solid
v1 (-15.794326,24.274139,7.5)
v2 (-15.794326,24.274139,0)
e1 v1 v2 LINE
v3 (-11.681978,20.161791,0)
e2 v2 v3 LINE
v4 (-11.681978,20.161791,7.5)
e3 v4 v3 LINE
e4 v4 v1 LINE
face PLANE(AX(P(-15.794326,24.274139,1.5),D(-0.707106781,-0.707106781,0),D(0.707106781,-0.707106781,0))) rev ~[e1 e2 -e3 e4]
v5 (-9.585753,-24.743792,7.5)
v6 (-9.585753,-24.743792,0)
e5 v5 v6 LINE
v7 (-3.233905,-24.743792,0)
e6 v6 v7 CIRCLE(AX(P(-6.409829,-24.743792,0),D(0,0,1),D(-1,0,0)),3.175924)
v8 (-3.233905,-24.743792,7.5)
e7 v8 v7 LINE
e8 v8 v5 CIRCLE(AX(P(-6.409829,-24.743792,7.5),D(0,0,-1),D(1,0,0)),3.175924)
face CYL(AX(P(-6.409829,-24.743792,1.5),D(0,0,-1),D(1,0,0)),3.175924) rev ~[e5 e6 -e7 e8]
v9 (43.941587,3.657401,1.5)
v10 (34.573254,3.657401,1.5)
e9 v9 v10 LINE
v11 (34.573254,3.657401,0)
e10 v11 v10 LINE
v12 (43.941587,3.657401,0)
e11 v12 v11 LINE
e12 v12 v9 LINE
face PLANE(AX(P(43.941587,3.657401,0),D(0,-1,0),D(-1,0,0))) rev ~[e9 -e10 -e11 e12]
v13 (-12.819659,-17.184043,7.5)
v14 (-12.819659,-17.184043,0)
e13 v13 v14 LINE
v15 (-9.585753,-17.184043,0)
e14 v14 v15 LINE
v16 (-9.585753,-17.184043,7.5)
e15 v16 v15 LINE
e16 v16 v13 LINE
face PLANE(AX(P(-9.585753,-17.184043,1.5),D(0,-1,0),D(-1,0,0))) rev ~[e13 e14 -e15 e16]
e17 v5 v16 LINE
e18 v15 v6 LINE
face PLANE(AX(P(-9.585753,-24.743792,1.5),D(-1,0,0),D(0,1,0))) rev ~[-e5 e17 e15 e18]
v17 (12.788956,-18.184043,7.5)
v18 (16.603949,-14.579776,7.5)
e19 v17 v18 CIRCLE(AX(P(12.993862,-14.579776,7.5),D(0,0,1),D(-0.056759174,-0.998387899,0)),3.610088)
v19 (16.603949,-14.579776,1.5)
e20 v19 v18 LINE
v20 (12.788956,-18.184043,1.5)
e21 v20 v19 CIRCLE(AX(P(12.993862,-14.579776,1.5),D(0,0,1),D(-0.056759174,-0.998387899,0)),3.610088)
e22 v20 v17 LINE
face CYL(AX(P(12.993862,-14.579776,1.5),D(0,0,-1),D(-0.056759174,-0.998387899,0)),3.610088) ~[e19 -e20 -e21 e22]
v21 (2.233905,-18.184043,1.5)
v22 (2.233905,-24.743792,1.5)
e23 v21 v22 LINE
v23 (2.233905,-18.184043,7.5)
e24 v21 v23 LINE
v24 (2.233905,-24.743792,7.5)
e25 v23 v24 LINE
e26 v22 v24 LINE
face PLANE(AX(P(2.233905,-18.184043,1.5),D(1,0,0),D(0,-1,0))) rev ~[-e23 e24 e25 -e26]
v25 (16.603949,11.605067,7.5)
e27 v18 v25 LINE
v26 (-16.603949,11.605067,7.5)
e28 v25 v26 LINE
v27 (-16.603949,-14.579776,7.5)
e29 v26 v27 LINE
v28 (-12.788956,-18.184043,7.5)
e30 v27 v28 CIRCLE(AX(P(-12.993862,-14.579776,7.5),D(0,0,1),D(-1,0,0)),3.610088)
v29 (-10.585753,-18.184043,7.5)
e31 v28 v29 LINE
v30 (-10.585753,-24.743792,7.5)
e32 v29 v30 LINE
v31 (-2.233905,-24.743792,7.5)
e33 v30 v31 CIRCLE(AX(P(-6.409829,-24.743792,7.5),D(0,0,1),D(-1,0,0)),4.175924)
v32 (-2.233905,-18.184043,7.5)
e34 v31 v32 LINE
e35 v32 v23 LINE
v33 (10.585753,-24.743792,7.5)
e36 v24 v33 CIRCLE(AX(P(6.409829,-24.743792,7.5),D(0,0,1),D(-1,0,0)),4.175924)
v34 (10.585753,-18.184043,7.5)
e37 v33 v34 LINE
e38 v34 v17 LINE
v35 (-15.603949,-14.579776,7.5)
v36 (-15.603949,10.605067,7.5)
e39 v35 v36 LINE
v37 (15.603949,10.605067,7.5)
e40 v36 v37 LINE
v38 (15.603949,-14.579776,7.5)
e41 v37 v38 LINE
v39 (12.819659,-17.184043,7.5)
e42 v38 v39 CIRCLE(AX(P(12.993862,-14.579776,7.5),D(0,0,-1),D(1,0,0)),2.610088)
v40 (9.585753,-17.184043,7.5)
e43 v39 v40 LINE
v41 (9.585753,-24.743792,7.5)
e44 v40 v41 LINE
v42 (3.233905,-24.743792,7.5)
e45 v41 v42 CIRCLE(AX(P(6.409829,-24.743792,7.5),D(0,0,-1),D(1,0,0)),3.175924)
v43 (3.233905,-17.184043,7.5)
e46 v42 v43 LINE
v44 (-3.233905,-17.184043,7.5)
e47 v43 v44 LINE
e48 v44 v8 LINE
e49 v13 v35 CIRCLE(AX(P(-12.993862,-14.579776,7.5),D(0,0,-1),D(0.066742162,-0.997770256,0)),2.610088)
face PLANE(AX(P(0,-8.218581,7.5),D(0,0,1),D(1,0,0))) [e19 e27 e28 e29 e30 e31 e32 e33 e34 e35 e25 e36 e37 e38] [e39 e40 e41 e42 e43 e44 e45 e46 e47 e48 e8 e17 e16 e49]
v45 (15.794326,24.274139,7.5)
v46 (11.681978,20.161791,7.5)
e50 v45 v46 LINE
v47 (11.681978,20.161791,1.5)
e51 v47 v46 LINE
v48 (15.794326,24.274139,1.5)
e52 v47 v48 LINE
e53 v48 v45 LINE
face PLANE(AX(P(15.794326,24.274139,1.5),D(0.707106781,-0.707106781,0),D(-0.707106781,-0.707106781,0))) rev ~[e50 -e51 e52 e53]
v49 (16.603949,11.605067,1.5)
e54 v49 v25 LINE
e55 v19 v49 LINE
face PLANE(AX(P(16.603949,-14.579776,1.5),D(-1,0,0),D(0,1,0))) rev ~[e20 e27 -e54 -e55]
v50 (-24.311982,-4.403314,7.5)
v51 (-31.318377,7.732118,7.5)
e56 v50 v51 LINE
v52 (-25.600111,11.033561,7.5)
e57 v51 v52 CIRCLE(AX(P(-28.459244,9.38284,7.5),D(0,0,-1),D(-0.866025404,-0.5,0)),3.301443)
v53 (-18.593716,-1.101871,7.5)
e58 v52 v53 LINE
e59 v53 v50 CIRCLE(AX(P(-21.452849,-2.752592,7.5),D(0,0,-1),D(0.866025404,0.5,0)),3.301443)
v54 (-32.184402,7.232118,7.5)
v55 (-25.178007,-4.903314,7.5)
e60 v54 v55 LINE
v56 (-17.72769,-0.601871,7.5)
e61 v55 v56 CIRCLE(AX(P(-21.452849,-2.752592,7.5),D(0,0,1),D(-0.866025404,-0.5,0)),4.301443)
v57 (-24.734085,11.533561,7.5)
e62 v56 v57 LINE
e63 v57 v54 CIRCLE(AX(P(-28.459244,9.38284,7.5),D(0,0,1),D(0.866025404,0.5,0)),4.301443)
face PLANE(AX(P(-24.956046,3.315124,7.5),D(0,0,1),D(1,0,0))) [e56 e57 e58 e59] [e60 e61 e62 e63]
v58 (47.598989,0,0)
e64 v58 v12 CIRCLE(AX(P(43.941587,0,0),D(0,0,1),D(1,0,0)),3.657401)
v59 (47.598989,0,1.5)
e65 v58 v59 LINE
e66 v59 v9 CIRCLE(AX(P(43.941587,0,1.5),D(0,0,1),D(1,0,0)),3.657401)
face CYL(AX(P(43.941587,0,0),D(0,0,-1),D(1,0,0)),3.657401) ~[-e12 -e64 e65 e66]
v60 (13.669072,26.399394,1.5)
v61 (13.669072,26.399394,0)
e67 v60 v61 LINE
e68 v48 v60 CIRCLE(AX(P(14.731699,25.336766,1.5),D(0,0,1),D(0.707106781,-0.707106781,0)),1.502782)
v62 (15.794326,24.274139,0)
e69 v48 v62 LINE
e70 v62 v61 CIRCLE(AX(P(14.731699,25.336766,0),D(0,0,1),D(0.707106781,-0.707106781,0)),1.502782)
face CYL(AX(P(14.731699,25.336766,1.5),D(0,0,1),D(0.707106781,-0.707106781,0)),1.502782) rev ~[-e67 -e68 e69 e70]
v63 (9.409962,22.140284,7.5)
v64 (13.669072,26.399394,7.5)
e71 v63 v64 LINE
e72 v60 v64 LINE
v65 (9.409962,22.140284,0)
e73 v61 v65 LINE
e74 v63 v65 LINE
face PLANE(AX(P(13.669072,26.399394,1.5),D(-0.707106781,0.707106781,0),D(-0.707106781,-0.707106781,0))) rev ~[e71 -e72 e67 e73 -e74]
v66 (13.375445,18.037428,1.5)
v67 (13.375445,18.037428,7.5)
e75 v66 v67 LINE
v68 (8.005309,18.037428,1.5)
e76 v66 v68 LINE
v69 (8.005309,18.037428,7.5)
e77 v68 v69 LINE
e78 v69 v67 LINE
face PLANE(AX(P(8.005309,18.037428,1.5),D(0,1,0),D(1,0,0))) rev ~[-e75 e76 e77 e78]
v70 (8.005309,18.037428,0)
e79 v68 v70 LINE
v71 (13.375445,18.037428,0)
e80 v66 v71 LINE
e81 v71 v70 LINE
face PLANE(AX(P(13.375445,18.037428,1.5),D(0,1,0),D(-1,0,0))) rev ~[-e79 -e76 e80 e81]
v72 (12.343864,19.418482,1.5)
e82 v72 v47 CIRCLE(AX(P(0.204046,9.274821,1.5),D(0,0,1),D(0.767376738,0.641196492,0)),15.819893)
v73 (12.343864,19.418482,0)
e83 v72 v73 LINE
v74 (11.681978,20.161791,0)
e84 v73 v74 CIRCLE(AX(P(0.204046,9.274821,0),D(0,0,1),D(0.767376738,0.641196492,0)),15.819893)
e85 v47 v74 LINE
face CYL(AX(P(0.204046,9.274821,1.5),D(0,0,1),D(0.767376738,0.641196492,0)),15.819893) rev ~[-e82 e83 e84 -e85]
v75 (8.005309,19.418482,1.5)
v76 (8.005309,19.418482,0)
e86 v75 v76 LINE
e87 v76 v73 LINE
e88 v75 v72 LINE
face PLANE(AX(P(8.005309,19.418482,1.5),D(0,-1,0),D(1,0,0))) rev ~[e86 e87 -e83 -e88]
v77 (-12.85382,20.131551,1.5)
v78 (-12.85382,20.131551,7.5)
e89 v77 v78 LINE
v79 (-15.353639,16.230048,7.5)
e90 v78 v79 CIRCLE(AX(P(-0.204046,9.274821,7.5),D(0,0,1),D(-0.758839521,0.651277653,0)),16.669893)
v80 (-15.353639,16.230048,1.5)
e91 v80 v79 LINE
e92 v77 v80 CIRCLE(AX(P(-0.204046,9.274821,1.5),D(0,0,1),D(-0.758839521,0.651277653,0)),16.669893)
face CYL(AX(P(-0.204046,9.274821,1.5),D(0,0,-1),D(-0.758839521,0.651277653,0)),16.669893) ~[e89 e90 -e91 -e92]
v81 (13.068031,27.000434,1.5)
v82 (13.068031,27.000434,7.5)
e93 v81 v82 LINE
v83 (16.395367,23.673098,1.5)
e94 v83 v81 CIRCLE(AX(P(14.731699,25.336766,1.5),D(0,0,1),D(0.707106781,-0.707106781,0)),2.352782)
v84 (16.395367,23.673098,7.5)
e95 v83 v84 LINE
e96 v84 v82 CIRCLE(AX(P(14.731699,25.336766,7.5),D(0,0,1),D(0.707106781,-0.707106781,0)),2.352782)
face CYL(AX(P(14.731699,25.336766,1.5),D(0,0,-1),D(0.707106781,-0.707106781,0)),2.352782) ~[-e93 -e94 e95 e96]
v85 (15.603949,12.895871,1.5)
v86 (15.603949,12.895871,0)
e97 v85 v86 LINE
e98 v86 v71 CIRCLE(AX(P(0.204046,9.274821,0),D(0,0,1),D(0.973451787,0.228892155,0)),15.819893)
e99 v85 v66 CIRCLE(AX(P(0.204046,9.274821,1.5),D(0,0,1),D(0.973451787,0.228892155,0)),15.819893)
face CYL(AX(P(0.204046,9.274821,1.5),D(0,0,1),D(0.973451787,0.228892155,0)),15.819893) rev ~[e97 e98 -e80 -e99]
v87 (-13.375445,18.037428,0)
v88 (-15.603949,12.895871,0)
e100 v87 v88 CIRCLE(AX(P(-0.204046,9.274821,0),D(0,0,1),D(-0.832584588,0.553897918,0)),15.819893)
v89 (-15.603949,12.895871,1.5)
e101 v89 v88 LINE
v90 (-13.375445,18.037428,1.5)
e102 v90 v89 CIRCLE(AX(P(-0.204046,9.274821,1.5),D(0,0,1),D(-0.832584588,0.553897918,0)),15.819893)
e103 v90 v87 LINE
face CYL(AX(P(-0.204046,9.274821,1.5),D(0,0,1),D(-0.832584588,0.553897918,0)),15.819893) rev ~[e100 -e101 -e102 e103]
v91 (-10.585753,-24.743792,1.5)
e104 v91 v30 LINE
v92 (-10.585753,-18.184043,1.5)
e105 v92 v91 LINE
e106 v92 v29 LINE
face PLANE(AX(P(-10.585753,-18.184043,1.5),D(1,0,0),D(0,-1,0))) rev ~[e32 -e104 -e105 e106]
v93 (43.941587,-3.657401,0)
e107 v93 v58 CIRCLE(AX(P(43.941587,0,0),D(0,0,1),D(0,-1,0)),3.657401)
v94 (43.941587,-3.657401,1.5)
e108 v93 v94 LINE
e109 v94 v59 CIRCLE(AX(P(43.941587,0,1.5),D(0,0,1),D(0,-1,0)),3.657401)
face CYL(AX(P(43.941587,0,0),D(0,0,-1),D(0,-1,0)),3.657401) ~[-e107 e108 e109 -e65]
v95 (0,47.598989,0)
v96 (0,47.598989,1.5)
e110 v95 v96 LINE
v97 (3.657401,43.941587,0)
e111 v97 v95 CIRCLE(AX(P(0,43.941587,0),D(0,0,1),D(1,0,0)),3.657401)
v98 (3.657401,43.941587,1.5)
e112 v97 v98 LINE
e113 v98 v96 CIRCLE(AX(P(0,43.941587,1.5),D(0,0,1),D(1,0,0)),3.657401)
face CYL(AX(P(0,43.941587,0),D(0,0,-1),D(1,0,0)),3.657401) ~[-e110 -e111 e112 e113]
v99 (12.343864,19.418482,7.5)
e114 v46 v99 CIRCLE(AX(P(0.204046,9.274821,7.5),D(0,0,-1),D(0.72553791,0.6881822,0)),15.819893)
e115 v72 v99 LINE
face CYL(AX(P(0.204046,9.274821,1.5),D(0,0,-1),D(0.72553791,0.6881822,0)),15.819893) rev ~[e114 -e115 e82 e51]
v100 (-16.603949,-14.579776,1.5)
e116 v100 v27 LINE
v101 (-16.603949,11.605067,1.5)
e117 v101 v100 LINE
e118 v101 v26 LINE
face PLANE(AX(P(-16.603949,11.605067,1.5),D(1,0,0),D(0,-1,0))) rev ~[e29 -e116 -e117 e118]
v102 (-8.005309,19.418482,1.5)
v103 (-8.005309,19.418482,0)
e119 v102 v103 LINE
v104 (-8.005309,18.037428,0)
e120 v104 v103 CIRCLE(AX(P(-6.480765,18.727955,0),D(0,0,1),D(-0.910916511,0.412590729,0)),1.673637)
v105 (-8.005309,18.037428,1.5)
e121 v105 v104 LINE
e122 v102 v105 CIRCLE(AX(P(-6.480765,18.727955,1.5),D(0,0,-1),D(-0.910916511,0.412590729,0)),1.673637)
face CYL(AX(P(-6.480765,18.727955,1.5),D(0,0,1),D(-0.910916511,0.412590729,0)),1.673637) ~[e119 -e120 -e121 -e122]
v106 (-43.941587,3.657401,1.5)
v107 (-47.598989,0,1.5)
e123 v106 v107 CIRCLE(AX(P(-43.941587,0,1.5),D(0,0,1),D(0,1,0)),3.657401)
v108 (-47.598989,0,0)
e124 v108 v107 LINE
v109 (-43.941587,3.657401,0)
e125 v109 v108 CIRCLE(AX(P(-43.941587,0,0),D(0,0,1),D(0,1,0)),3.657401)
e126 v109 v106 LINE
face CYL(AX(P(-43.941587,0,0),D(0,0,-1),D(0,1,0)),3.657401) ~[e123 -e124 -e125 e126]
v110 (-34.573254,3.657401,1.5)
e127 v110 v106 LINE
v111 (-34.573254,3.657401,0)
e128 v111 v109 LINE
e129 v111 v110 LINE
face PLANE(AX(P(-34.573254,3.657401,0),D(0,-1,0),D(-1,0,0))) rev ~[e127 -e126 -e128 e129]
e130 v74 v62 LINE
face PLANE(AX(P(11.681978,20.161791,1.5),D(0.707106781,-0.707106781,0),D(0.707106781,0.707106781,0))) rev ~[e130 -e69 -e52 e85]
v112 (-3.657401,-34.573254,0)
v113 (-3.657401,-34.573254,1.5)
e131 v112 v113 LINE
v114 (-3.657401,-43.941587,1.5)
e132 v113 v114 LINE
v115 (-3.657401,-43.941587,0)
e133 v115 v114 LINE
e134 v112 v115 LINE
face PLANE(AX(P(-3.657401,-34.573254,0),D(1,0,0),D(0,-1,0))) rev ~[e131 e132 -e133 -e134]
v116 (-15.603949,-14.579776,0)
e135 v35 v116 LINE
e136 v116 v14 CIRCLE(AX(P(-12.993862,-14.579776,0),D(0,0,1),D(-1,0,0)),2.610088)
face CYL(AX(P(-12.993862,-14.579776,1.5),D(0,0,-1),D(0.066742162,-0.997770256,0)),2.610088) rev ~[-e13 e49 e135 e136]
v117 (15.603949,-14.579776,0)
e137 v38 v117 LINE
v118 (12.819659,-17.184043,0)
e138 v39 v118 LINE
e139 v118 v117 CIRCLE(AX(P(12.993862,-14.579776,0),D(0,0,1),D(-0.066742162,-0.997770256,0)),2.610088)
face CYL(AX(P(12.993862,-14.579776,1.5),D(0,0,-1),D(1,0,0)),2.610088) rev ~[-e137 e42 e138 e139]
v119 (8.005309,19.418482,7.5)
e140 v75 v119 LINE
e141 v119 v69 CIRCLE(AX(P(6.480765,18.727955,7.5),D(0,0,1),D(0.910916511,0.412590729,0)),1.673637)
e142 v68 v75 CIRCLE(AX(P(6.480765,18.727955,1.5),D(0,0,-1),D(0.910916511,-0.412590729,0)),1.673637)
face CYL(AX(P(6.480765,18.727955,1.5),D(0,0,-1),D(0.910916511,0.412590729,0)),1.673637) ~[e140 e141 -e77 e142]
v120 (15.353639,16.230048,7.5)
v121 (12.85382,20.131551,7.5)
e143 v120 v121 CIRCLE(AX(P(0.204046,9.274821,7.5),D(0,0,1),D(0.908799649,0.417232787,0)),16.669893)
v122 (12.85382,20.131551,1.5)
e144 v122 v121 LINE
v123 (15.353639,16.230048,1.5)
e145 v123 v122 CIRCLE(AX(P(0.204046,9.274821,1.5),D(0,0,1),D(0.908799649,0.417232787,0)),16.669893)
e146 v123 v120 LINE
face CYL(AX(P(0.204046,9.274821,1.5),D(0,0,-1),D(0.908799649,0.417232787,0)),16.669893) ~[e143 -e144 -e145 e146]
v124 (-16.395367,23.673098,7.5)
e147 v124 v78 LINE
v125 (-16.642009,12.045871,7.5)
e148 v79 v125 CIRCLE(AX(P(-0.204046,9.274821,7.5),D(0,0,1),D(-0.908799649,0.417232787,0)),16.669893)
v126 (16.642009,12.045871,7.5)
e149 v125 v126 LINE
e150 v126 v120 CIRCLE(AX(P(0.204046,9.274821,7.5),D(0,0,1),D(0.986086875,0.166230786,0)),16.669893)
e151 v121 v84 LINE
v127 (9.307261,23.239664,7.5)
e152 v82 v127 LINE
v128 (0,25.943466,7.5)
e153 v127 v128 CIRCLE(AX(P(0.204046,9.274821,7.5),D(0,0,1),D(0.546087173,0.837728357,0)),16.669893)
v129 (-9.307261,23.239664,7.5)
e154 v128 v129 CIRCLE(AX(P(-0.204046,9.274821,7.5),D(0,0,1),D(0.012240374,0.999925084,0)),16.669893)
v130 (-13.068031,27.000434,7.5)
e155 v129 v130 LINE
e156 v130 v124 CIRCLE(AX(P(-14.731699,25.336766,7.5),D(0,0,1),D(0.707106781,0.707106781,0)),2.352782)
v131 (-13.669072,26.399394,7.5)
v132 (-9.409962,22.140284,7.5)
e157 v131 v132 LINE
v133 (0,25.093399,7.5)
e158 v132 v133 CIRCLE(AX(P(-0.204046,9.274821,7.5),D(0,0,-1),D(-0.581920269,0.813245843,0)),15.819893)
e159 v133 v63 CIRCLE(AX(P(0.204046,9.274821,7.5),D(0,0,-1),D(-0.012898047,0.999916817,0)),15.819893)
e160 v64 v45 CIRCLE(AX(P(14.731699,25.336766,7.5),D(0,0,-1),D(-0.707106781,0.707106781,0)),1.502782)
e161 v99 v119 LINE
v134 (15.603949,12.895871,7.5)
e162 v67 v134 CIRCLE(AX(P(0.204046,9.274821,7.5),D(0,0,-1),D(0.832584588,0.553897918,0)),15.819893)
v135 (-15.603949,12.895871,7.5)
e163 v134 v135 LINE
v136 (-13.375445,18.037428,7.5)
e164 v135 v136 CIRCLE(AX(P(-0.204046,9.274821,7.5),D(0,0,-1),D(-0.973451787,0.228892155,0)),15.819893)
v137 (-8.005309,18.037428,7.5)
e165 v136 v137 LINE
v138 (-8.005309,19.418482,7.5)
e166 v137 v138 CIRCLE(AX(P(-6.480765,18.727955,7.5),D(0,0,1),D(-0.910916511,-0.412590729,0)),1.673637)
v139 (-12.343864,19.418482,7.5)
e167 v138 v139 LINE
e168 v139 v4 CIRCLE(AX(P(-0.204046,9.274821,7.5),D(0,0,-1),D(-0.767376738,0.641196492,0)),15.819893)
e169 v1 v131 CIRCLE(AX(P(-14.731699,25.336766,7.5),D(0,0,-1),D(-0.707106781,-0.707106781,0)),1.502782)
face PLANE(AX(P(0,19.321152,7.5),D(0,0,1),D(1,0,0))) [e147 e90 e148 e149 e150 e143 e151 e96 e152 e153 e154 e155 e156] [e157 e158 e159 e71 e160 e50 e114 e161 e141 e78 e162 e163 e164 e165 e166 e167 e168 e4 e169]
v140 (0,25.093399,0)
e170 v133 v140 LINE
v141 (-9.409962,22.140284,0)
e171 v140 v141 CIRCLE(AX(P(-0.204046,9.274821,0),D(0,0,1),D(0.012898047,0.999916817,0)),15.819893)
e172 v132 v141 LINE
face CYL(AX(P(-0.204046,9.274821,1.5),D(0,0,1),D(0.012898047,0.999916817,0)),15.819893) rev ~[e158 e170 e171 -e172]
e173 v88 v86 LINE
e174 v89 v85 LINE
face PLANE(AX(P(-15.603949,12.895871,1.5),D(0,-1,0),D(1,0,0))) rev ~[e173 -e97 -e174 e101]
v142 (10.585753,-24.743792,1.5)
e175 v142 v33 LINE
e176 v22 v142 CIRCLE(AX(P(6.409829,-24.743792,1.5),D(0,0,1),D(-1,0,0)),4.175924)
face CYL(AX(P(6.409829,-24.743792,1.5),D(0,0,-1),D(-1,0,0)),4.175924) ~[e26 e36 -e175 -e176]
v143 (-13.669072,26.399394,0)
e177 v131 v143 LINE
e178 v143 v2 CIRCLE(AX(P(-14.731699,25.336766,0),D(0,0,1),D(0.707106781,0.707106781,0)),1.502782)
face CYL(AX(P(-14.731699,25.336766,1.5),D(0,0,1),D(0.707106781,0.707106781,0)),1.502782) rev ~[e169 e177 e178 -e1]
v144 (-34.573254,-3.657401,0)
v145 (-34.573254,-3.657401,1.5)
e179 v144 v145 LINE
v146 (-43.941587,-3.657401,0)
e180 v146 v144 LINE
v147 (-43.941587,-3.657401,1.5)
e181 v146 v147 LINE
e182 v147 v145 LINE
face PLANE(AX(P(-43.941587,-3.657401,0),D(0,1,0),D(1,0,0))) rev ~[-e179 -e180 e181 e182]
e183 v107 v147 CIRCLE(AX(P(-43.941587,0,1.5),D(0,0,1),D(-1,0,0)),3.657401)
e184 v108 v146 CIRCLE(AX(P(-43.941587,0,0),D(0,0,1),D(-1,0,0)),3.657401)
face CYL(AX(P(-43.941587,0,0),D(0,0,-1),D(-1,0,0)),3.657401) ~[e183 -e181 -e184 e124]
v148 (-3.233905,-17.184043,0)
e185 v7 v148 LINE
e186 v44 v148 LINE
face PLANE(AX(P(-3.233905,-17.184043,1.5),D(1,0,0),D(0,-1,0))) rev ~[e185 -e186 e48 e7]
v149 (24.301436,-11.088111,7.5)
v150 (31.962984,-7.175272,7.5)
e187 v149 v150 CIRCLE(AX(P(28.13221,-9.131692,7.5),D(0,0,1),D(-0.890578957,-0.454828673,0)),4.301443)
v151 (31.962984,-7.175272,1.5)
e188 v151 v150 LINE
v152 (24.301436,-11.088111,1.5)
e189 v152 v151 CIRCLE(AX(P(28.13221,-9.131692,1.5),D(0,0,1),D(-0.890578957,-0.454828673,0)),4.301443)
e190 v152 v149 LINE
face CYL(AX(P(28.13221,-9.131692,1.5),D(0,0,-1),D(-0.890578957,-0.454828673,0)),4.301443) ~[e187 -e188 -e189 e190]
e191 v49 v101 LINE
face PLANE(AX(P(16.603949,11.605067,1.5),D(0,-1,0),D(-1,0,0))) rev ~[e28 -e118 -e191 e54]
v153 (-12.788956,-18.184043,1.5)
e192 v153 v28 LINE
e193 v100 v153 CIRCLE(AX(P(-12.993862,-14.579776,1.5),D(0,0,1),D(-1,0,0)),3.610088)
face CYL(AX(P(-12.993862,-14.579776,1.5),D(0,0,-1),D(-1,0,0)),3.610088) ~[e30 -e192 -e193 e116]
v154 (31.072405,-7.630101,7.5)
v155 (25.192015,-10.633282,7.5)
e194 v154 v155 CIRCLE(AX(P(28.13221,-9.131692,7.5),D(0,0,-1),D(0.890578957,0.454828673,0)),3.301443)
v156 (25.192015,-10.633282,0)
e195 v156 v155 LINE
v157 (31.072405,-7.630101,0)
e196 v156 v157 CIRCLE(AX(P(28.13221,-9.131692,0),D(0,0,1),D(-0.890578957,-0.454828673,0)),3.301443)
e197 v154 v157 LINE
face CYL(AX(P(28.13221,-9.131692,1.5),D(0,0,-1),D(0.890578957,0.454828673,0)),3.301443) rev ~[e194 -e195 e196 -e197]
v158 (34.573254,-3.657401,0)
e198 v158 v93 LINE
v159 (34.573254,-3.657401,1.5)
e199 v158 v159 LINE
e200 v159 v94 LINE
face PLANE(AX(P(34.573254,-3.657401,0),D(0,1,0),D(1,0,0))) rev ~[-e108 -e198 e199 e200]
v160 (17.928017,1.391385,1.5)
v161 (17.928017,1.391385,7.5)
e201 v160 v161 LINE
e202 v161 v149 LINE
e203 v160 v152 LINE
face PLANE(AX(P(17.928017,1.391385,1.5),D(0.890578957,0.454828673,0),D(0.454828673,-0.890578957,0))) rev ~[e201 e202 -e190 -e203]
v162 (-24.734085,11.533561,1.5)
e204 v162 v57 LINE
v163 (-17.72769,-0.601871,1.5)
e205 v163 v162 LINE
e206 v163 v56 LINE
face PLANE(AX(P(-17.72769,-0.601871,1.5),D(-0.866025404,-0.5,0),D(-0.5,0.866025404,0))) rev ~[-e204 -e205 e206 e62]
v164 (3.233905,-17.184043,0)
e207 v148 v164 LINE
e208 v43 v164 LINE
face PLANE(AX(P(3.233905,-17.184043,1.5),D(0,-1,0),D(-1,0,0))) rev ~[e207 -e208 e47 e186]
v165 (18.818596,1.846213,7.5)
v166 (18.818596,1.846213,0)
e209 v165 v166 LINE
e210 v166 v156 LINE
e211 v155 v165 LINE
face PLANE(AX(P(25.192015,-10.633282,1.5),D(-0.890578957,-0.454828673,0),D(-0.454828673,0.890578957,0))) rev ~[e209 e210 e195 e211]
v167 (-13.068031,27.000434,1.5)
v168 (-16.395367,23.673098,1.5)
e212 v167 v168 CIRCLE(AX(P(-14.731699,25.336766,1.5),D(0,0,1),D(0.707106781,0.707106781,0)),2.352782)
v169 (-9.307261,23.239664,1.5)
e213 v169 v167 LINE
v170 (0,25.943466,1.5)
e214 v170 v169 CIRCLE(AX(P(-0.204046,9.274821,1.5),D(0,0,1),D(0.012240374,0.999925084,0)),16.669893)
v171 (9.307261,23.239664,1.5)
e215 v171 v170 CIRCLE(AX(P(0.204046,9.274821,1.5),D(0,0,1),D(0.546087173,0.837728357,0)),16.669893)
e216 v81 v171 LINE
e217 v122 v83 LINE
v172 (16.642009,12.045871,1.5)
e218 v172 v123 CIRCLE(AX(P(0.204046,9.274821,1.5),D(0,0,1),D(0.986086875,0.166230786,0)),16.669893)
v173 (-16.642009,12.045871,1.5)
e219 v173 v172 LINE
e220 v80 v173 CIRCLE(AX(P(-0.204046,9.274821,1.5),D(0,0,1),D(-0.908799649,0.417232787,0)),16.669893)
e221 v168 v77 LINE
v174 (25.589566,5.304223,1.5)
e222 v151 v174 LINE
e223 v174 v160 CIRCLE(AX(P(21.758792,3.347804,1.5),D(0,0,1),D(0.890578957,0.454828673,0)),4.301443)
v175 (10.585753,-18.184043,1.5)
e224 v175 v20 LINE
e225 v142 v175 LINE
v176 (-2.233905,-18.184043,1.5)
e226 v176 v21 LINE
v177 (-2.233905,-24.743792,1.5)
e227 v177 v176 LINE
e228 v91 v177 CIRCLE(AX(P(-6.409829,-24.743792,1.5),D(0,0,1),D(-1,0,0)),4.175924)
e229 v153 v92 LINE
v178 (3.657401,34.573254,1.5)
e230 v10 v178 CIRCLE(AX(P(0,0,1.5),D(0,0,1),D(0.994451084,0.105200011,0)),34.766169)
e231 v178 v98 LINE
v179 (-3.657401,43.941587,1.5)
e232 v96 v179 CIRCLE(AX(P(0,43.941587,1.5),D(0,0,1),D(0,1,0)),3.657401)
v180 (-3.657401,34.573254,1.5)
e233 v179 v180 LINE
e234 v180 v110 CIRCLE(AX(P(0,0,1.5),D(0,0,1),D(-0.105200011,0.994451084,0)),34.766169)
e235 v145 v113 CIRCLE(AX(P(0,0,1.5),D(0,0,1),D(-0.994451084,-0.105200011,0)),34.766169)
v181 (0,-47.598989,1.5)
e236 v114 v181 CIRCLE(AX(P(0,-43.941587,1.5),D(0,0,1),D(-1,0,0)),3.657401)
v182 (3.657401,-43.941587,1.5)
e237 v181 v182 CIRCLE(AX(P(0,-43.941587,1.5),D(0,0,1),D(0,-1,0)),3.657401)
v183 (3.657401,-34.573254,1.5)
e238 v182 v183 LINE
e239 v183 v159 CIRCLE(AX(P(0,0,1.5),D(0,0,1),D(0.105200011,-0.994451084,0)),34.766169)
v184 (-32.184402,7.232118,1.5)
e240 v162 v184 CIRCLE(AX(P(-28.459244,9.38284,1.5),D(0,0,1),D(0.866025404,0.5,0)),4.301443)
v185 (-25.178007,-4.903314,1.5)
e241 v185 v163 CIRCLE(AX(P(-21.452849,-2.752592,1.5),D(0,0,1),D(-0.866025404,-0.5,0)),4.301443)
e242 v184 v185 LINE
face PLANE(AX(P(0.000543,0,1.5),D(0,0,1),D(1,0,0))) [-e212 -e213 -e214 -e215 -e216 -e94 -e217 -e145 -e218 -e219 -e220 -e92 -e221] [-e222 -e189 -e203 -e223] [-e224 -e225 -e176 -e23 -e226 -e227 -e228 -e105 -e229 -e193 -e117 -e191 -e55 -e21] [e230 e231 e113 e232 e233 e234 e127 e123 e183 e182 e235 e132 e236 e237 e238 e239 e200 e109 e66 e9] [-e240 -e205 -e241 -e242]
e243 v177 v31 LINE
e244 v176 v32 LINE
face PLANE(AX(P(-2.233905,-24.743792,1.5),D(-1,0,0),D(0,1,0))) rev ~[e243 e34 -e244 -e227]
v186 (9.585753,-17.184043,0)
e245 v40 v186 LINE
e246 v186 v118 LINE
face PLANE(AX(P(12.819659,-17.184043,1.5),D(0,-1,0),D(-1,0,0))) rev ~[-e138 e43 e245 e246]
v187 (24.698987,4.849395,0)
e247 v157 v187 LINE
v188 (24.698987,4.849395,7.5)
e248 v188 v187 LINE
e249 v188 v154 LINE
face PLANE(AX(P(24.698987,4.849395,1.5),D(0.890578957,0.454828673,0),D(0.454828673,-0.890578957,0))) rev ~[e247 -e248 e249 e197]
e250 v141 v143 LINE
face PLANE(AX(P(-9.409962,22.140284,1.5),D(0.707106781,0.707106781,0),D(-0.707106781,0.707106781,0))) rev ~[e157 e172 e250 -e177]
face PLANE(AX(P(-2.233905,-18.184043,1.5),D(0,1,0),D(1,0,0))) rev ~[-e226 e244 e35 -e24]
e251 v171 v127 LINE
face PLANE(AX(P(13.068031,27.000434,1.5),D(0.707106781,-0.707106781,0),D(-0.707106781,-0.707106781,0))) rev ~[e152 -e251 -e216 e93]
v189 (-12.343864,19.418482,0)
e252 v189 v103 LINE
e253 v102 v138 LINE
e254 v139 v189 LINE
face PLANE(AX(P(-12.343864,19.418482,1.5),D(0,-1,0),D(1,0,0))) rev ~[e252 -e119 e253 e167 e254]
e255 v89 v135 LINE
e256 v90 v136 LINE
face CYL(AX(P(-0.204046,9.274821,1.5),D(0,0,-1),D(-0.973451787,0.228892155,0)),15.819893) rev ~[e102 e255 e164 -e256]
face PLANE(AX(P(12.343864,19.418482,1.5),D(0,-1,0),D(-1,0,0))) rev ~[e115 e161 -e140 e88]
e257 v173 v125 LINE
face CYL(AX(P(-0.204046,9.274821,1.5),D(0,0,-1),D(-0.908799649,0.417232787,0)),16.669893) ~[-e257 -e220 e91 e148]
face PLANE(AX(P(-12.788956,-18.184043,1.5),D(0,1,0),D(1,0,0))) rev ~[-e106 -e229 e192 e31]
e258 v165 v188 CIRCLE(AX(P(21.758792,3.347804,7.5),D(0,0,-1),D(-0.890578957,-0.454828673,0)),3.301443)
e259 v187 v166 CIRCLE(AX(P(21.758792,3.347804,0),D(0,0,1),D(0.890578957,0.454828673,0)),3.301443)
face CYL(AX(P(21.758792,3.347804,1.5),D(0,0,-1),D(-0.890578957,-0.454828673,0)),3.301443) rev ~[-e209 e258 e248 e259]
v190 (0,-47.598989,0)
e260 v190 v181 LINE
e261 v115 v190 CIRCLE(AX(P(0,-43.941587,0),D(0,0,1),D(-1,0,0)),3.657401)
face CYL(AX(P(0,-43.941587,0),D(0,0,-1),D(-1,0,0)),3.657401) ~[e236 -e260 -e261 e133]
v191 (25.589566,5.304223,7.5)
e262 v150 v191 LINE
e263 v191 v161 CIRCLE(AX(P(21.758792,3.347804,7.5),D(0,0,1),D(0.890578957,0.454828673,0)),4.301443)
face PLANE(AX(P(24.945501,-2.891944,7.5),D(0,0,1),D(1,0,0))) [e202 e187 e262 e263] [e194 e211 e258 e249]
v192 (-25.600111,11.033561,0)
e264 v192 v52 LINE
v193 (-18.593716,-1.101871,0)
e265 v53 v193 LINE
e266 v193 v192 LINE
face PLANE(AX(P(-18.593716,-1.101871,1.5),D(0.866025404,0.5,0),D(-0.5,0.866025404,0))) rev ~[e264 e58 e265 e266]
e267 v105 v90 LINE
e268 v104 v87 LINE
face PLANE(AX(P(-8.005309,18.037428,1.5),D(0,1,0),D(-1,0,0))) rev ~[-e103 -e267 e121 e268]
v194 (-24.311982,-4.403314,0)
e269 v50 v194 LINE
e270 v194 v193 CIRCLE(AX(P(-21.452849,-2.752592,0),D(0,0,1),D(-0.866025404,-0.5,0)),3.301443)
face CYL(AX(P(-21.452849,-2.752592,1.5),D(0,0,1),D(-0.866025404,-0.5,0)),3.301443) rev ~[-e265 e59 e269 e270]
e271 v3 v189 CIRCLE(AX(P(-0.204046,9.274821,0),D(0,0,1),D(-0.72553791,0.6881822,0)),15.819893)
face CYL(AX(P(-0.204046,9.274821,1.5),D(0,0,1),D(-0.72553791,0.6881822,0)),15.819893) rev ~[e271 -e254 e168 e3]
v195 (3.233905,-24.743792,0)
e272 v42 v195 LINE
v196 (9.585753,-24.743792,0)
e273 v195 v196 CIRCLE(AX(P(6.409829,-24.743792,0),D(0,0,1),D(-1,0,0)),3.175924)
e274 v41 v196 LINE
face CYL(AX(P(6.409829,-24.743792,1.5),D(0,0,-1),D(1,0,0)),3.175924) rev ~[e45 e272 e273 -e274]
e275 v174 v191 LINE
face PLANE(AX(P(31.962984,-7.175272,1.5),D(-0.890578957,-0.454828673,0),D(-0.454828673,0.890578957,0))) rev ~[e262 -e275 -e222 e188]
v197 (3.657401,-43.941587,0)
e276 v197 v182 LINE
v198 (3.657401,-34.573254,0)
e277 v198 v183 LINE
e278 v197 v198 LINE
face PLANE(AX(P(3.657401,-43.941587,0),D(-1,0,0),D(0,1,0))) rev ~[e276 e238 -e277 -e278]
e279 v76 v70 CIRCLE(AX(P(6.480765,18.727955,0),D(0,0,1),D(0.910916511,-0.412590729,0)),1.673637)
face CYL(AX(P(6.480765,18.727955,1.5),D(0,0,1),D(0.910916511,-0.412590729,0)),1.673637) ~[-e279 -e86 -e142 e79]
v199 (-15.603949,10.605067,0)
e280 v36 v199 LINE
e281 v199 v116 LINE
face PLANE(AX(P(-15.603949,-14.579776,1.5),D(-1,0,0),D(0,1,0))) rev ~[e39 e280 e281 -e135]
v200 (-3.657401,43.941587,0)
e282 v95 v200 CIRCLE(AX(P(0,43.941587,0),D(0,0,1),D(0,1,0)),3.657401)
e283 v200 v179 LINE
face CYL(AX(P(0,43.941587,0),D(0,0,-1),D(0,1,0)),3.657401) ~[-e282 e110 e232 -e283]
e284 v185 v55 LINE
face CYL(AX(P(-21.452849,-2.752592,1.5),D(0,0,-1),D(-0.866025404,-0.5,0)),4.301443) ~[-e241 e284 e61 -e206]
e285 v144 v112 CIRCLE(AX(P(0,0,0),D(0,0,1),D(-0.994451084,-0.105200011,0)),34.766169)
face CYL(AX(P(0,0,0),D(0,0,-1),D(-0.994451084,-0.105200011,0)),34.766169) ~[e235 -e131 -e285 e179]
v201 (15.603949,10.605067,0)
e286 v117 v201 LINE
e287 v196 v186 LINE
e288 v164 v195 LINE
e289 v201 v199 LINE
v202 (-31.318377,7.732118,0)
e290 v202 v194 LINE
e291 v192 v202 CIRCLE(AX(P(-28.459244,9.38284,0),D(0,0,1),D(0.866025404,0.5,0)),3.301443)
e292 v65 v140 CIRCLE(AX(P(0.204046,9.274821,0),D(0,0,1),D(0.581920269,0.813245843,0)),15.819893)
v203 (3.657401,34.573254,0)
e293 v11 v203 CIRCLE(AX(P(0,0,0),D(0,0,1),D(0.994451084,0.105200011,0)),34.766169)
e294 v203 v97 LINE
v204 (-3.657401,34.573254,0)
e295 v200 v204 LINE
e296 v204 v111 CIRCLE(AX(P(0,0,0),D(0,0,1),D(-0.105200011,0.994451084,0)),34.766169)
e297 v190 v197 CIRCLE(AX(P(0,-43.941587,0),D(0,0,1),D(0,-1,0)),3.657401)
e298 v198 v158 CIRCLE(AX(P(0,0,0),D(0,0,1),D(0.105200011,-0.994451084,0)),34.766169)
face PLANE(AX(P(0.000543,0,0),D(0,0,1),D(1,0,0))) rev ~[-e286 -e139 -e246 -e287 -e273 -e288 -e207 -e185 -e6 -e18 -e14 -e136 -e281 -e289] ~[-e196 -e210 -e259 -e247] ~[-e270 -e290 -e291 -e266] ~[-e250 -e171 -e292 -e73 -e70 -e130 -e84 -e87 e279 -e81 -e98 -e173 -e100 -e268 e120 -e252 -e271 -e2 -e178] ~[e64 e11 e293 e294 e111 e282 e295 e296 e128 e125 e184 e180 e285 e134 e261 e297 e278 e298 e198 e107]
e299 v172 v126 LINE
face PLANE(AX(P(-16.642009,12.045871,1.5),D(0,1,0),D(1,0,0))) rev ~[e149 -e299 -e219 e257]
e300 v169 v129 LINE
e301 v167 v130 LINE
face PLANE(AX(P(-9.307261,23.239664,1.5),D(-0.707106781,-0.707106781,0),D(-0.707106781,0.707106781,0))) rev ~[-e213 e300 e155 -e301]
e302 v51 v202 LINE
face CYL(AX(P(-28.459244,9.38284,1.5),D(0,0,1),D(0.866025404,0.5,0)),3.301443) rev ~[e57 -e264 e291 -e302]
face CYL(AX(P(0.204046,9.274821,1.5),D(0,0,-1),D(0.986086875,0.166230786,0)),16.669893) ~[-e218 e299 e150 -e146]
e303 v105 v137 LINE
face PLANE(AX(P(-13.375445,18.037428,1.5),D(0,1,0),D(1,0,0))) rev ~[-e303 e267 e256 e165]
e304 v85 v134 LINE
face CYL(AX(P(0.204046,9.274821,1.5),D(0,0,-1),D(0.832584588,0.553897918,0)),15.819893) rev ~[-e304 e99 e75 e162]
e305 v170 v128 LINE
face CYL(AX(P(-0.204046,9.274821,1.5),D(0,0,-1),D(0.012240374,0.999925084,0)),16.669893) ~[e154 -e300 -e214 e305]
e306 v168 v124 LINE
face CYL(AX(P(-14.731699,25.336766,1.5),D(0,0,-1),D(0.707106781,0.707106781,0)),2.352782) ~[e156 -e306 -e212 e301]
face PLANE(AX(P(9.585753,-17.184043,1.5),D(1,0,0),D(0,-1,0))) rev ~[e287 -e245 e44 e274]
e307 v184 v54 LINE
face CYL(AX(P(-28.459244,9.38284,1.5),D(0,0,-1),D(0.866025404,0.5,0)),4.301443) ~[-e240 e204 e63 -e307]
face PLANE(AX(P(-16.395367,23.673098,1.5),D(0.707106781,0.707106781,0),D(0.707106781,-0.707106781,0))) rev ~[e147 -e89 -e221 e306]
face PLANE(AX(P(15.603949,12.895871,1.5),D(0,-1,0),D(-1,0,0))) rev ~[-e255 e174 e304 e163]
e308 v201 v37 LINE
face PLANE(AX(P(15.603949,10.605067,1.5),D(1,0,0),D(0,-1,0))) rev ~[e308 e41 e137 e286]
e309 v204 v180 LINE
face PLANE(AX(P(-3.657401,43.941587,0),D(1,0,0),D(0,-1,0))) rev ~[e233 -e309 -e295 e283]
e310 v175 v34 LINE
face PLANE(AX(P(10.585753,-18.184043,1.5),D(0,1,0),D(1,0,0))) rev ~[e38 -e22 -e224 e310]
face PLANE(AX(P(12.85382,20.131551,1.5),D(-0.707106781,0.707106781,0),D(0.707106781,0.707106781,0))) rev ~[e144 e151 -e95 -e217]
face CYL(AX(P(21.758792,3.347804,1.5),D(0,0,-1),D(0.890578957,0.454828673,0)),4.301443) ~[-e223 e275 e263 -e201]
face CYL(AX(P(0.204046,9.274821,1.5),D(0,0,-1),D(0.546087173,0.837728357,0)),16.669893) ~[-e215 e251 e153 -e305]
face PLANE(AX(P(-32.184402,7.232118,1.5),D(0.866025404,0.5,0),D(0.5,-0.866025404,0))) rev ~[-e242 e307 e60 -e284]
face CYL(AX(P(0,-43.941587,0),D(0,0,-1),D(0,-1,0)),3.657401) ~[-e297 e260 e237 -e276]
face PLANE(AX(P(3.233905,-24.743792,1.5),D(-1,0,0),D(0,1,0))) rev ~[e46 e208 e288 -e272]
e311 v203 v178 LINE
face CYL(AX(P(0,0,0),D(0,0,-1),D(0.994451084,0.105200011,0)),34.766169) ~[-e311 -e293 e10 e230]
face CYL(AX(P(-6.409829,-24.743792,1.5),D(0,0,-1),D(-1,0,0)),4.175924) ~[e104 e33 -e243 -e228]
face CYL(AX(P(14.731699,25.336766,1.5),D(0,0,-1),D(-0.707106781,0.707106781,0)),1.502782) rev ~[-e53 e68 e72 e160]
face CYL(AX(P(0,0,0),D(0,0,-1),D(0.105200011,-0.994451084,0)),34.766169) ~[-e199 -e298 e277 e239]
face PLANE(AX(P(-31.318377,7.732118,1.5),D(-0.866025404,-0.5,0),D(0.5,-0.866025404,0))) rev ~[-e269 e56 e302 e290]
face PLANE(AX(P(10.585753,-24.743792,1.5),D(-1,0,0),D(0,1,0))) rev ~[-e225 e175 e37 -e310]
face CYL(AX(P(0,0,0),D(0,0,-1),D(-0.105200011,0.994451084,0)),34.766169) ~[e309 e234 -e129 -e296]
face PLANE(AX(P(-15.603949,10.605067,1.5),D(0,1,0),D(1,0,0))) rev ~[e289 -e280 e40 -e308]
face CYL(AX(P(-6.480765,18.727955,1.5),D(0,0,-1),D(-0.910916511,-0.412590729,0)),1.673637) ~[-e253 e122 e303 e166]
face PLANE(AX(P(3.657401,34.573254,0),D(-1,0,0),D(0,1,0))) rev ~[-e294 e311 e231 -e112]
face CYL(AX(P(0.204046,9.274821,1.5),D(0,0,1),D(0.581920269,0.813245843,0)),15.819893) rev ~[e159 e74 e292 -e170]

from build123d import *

# Parameters (mm, degrees)
F1_DEPTH = 3
F3_DEPTH = 25
F6_DEPTH = 12
F7_DEPTH = 12
F8_SCALE = 0.5


# Not quite as in the source:
# - a feature of the source that left no trace in its solid (it failed there, or was rolled back) is left out
# - a feature names something its author has since deleted; it is built from what else it names


with BuildPart() as f1:
    # F0 (on Top) → F1 (new body)
    with BuildSketch(Plane.XY):
        with BuildLine():
            ThreePointArc((69.1465082783, -7.3148026297), (69.4358131239, -3.6624855503), (69.532337402, 0))
            ThreePointArc((69.532337402, 0), (69.4358131239, 3.6624855503), (69.1465082783, 7.3148026297))
            ThreePointArc((69.1465082783, 7.3148026297), (49.1667872887, 49.1667872887), (7.3148026297, 69.1465082783))
            ThreePointArc((7.3148026297, 69.1465082783), (0, 69.532337402), (-7.3148026297, 69.1465082783))
            ThreePointArc((-7.3148026297, 69.1465082783), (-49.1667872887, 49.1667872887), (-69.1465082783, 7.3148026297))
            ThreePointArc((-69.1465082783, 7.3148026297), (-69.532337402, 0), (-69.1465082783, -7.3148026297))
            ThreePointArc((-69.1465082783, -7.3148026297), (-49.1667872887, -49.1667872887), (-7.3148026297, -69.1465082783))
            ThreePointArc((-7.3148026297, -69.1465082783), (0, -69.532337402), (7.3148026297, -69.1465082783))
            ThreePointArc((7.3148026297, -69.1465082783), (49.1667872887, -49.1667872887), (69.1465082783, -7.3148026297))
        make_face()
        with BuildLine():
            ThreePointArc((69.1465082783, 7.3148026297), (69.4358131239, 3.6624855503), (69.532337402, 0))
            ThreePointArc((69.532337402, 0), (69.4358131239, -3.6624855503), (69.1465082783, -7.3148026297))
            Line((69.1465082783, -7.3148026297), (87.8831749798, -7.3148026297))
            ThreePointArc((87.8831749798, -7.3148026297), (93.0555215223, -5.1723465425), (95.1979776095, 0))
            ThreePointArc((95.1979776095, 0), (93.0555215223, 5.1723465425), (87.8831749798, 7.3148026297))
            Line((87.8831749798, 7.3148026297), (69.1465082783, 7.3148026297))
        make_face()
        with BuildLine():
            ThreePointArc((-7.3148026297, 69.1465082783), (0, 69.532337402), (7.3148026297, 69.1465082783))
            Line((7.3148026297, 69.1465082783), (7.3148026297, 87.8831749798))
            ThreePointArc((7.3148026297, 87.8831749798), (5.1723465425, 93.0555215223), (0, 95.1979776095))
            ThreePointArc((0, 95.1979776095), (-5.1723465425, 93.0555215223), (-7.3148026297, 87.8831749798))
            Line((-7.3148026297, 87.8831749798), (-7.3148026297, 69.1465082783))
        make_face()
        with BuildLine():
            Line((7.3148026297, -87.8831749798), (7.3148026297, -69.1465082783))
            ThreePointArc((7.3148026297, -69.1465082783), (0, -69.532337402), (-7.3148026297, -69.1465082783))
            Line((-7.3148026297, -69.1465082783), (-7.3148026297, -87.8831749798))
            ThreePointArc((-7.3148026297, -87.8831749798), (-5.1723465425, -93.0555215223), (0, -95.1979776095))
            ThreePointArc((0, -95.1979776095), (5.1723465425, -93.0555215223), (7.3148026297, -87.8831749798))
        make_face()
        with BuildLine():
            ThreePointArc((-69.1465082783, -7.3148026297), (-69.532337402, 0), (-69.1465082783, 7.3148026297))
            Line((-69.1465082783, 7.3148026297), (-87.8831749798, 7.3148026297))
            ThreePointArc((-87.8831749798, 7.3148026297), (-93.0555215223, 5.1723465425), (-95.1979776095, 0))
            ThreePointArc((-95.1979776095, 0), (-93.0555215223, -5.1723465425), (-87.8831749798, -7.3148026297))
            Line((-87.8831749798, -7.3148026297), (-69.1465082783, -7.3148026297))
        make_face()
    extrude(amount=F1_DEPTH)

    # F2 (on face) → F3 (cut)
    with BuildSketch(Plane.XY.offset(3)):
        with BuildLine():
            ThreePointArc((-51.2002213642, 22.0671218808), (-60.2199302878, 24.4839456028), (-62.6367540099, 15.4642366792))
            Line((-62.6367540099, 15.4642366792), (-48.6239641905, -8.8066272438))
            ThreePointArc((-48.6239641905, -8.8066272438), (-39.6042552669, -11.2234509658), (-37.1874315448, -2.2037420422))
            Line((-37.1874315448, -2.2037420422), (-51.2002213642, 22.0671218808))
        make_face()
        with BuildLine():
            Line((0, 21.2101340294), (-31.2078986317, 21.2101340294))
            Line((-31.2078986317, 21.2101340294), (-31.2078986317, -29.1595514864))
            ThreePointArc((-31.2078986317, -29.1595514864), (-29.5536377946, -32.97196325), (-25.6393177885, -34.3680869058))
            Line((-25.6393177885, -34.3680869058), (-19.1715068486, -34.3680869058))
            Line((-19.1715068486, -34.3680869058), (-19.1715068486, -49.4875834141))
            ThreePointArc((-19.1715068486, -49.4875834141), (-12.8196588942, -55.8394313684), (-6.4678109399, -49.4875834141))
            Line((-6.4678109399, -49.4875834141), (-6.4678109399, -34.3680869058))
            Line((-6.4678109399, -34.3680869058), (0, -34.3680869058))
            Line((0, -34.3680869058), (6.4678109399, -34.3680869058))
            Line((6.4678109399, -34.3680869058), (6.4678109399, -49.4875834141))
            ThreePointArc((6.4678109399, -49.4875834141), (12.8196588942, -55.8394313684), (19.1715068486, -49.4875834141))
            Line((19.1715068486, -49.4875834141), (19.1715068486, -34.3680869058))
            Line((19.1715068486, -34.3680869058), (25.6393177885, -34.3680869058))
            ThreePointArc((25.6393177885, -34.3680869058), (29.5536377946, -32.97196325), (31.2078986317, -29.1595514864))
            Line((31.2078986317, -29.1595514864), (31.2078986317, 21.2101340294))
            Line((31.2078986317, 21.2101340294), (0, 21.2101340294))
        make_face()
        with BuildLine():
            ThreePointArc((18.8199247983, 44.2805681259), (9.8819802161, 48.7377457179), (0, 50.1867979765))
            ThreePointArc((0, 50.1867979765), (-9.8819802161, 48.7377457179), (-18.8199247983, 44.2805681259))
            Line((-18.8199247983, 44.2805681259), (-27.3381436975, 52.7987870252))
            ThreePointArc((-27.3381436975, 52.7987870252), (-31.5886529958, 52.7987870252), (-31.5886529958, 48.5482777269))
            Line((-31.5886529958, 48.5482777269), (-23.3639563844, 40.3235811155))
            ThreePointArc((-23.3639563844, 40.3235811155), (-24.0375361692, 39.5906852357), (-24.6877279792, 38.8369633325))
            Line((-24.6877279792, 38.8369633325), (-16.0106173244, 38.8369633325))
            ThreePointArc((-16.0106173244, 38.8369633325), (-9.6142565188, 37.4559091891), (-16.0106173244, 36.0748550456))
            Line((-16.0106173244, 36.0748550456), (-26.7508904588, 36.0748550456))
            ThreePointArc((-26.7508904588, 36.0748550456), (-29.4383336901, 31.1322164007), (-31.2078986317, 25.7917419076))
            Line((-31.2078986317, 25.7917419076), (0, 25.7917419076))
            Line((0, 25.7917419076), (31.2078986317, 25.7917419076))
            ThreePointArc((31.2078986317, 25.7917419076), (29.4383336901, 31.1322164007), (26.7508904588, 36.0748550456))
            Line((26.7508904588, 36.0748550456), (16.0106173244, 36.0748550456))
            ThreePointArc((16.0106173244, 36.0748550456), (9.6142565188, 37.4559091891), (16.0106173244, 38.8369633325))
            Line((16.0106173244, 38.8369633325), (24.6877279792, 38.8369633325))
            ThreePointArc((24.6877279792, 38.8369633325), (24.0375361692, 39.5906852357), (23.3639563844, 40.3235811155))
            Line((23.3639563844, 40.3235811155), (31.5886529958, 48.5482777269))
            ThreePointArc((31.5886529958, 48.5482777269), (31.5886529958, 52.7987870252), (27.3381436975, 52.7987870252))
            Line((27.3381436975, 52.7987870252), (18.8199247983, 44.2805681259))
        make_face()
        with BuildLine():
            ThreePointArc((50.3840297461, -21.2665649388), (59.2676018747, -24.1437740388), (62.1448109747, -15.2602019102))
            Line((62.1448109747, -15.2602019102), (49.3979737771, 9.6987895668))
            ThreePointArc((49.3979737771, 9.6987895668), (40.5144016484, 12.5759986668), (37.6371925484, 3.6924265381))
            Line((37.6371925484, 3.6924265381), (50.3840297461, -21.2665649388))
        make_face()
    extrude(amount=-F3_DEPTH, mode=Mode.SUBTRACT)

    # F4 (on face) → F6 (join)
    with BuildSketch(Plane.XY.offset(3)):
        with BuildLine():
            ThreePointArc((51.1791316906, 10.6084469128), (39.6047443024, 14.3571565803), (35.8560346349, 2.7827691921))
            Line((35.8560346349, 2.7827691921), (48.6028718326, -22.1762222849))
            ThreePointArc((48.6028718326, -22.1762222849), (60.1772592207, -25.9249319523), (63.9259688882, -14.3505445642))
            Line((63.9259688882, -14.3505445642), (51.1791316906, 10.6084469128))
        make_face()
        with BuildLine():
            Line((50.3840297461, -21.2665649388), (37.6371925484, 3.6924265381))
            ThreePointArc((37.6371925484, 3.6924265381), (40.5144016484, 12.5759986668), (49.3979737771, 9.6987895668))
            Line((49.3979737771, 9.6987895668), (62.1448109747, -15.2602019102))
            ThreePointArc((62.1448109747, -15.2602019102), (59.2676018747, -24.1437740388), (50.3840297461, -21.2665649388))
        make_face(mode=Mode.SUBTRACT)
        with BuildLine():
            ThreePointArc((-50.3560149981, -9.8066272438), (-38.6042552669, -12.9555017734), (-35.4553807372, -1.2037420422))
            Line((-35.4553807372, -1.2037420422), (-49.4681705566, 23.0671218808))
            ThreePointArc((-49.4681705566, 23.0671218808), (-61.2199302878, 26.2159964104), (-64.3688048174, 14.4642366792))
            Line((-64.3688048174, 14.4642366792), (-50.3560149981, -9.8066272438))
        make_face()
        with BuildLine():
            Line((-51.2002213642, 22.0671218808), (-37.1874315448, -2.2037420422))
            ThreePointArc((-37.1874315448, -2.2037420422), (-39.6042552669, -11.2234509658), (-48.6239641905, -8.8066272438))
            Line((-48.6239641905, -8.8066272438), (-62.6367540099, 15.4642366792))
            ThreePointArc((-62.6367540099, 15.4642366792), (-60.2199302878, 24.4839456028), (-51.2002213642, 22.0671218808))
        make_face(mode=Mode.SUBTRACT)
    extrude(amount=F6_DEPTH)

    # F4 (on face) → F7 (join)
    with BuildSketch(Plane.XY.offset(3)):
        with BuildLine():
            Line((33.2078986317, -29.1595514864), (33.2078986317, 23.2101340294))
            Line((33.2078986317, 23.2101340294), (-33.2078986317, 23.2101340294))
            Line((-33.2078986317, 23.2101340294), (-33.2078986317, 6.1129540636))
            Line((-33.2078986317, 6.1129540636), (-33.2078986317, -29.1595514864))
            ThreePointArc((-33.2078986317, -29.1595514864), (-30.9461517209, -34.4078767665), (-25.5779123872, -36.3680869058))
            Line((-25.5779123872, -36.3680869058), (-21.1715068486, -36.3680869058))
            Line((-21.1715068486, -36.3680869058), (-21.1715068486, -49.4875834141))
            ThreePointArc((-21.1715068486, -49.4875834141), (-12.8196588942, -57.8394313684), (-4.4678109399, -49.4875834141))
            Line((-4.4678109399, -49.4875834141), (-4.4678109399, -36.3680869058))
            Line((-4.4678109399, -36.3680869058), (4.4678109399, -36.3680869058))
            Line((4.4678109399, -36.3680869058), (4.4678109399, -49.4875834141))
            ThreePointArc((4.4678109399, -49.4875834141), (12.8196588942, -57.8394313684), (21.1715068486, -49.4875834141))
            Line((21.1715068486, -49.4875834141), (21.1715068486, -36.3680869058))
            Line((21.1715068486, -36.3680869058), (25.5779123872, -36.3680869058))
            ThreePointArc((25.5779123872, -36.3680869058), (30.9461517209, -34.4078767665), (33.2078986317, -29.1595514864))
        make_face()
        with BuildLine():
            Line((31.2078986317, 21.2101340294), (31.2078986317, -29.1595514864))
            ThreePointArc((31.2078986317, -29.1595514864), (29.5536377946, -32.97196325), (25.6393177885, -34.3680869058))
            Line((25.6393177885, -34.3680869058), (19.1715068486, -34.3680869058))
            Line((19.1715068486, -34.3680869058), (19.1715068486, -49.4875834141))
            ThreePointArc((19.1715068486, -49.4875834141), (12.8196588942, -55.8394313684), (6.4678109399, -49.4875834141))
            Line((6.4678109399, -49.4875834141), (6.4678109399, -34.3680869058))
            Line((6.4678109399, -34.3680869058), (-6.4678109399, -34.3680869058))
            Line((-6.4678109399, -34.3680869058), (-6.4678109399, -49.4875834141))
            ThreePointArc((-6.4678109399, -49.4875834141), (-12.8196588942, -55.8394313684), (-19.1715068486, -49.4875834141))
            Line((-19.1715068486, -49.4875834141), (-19.1715068486, -34.3680869058))
            Line((-19.1715068486, -34.3680869058), (-25.6393177885, -34.3680869058))
            ThreePointArc((-25.6393177885, -34.3680869058), (-29.5536377946, -32.97196325), (-31.2078986317, -29.1595514864))
            Line((-31.2078986317, -29.1595514864), (-31.2078986317, 21.2101340294))
            Line((-31.2078986317, 21.2101340294), (31.2078986317, 21.2101340294))
        make_face(mode=Mode.SUBTRACT)
        with BuildLine():
            ThreePointArc((-25.707639439, 40.2631011141), (-28.4799020501, 36.5361613442), (-30.7072781513, 32.4600951356))
            ThreePointArc((-30.7072781513, 32.4600951356), (-32.2715668081, 28.3608780057), (-33.284017822, 24.0917419076))
            Line((-33.284017822, 24.0917419076), (33.284017822, 24.0917419076))
            ThreePointArc((33.284017822, 24.0917419076), (32.2715668081, 28.3608780057), (30.7072781513, 32.4600951356))
            ThreePointArc((30.7072781513, 32.4600951356), (28.4799020501, 36.5361613442), (25.707639439, 40.2631011141))
            Line((25.707639439, 40.2631011141), (32.7907345238, 47.3461961989))
            ThreePointArc((32.7907345238, 47.3461961989), (32.7907345238, 54.0008685532), (26.1360621695, 54.0008685532))
            Line((26.1360621695, 54.0008685532), (18.6145214728, 46.4793278565))
            ThreePointArc((18.6145214728, 46.4793278565), (9.708938731, 50.565820618), (0, 51.8869321878))
            ThreePointArc((0, 51.8869321878), (-9.708938731, 50.565820618), (-18.6145214728, 46.4793278565))
            Line((-18.6145214728, 46.4793278565), (-26.1360621695, 54.0008685532))
            ThreePointArc((-26.1360621695, 54.0008685532), (-32.7907345238, 54.0008685532), (-32.7907345238, 47.3461961989))
            Line((-32.7907345238, 47.3461961989), (-25.707639439, 40.2631011141))
        make_face()
        with BuildLine():
            ThreePointArc((16.0106173244, 38.8369633325), (9.6142565188, 37.4559091891), (16.0106173244, 36.0748550456))
            Line((16.0106173244, 36.0748550456), (26.7508904588, 36.0748550456))
            ThreePointArc((26.7508904588, 36.0748550456), (29.4383336901, 31.1322164007), (31.2078986317, 25.7917419076))
            Line((31.2078986317, 25.7917419076), (-31.2078986317, 25.7917419076))
            ThreePointArc((-31.2078986317, 25.7917419076), (-29.4383336901, 31.1322164007), (-26.7508904588, 36.0748550456))
            Line((-26.7508904588, 36.0748550456), (-16.0106173244, 36.0748550456))
            ThreePointArc((-16.0106173244, 36.0748550456), (-9.6142565188, 37.4559091891), (-16.0106173244, 38.8369633325))
            Line((-16.0106173244, 38.8369633325), (-24.6877279792, 38.8369633325))
            ThreePointArc((-24.6877279792, 38.8369633325), (-24.0375361692, 39.5906852357), (-23.3639563844, 40.3235811155))
            Line((-23.3639563844, 40.3235811155), (-31.5886529958, 48.5482777269))
            ThreePointArc((-31.5886529958, 48.5482777269), (-31.5886529958, 52.7987870252), (-27.3381436975, 52.7987870252))
            Line((-27.3381436975, 52.7987870252), (-18.8199247983, 44.2805681259))
            ThreePointArc((-18.8199247983, 44.2805681259), (-9.8819802161, 48.7377457179), (0, 50.1867979765))
            ThreePointArc((0, 50.1867979765), (9.8819802161, 48.7377457179), (18.8199247983, 44.2805681259))
            Line((18.8199247983, 44.2805681259), (27.3381436975, 52.7987870252))
            ThreePointArc((27.3381436975, 52.7987870252), (31.5886529958, 52.7987870252), (31.5886529958, 48.5482777269))
            Line((31.5886529958, 48.5482777269), (23.3639563844, 40.3235811155))
            ThreePointArc((23.3639563844, 40.3235811155), (24.0375361692, 39.5906852357), (24.6877279792, 38.8369633325))
            Line((24.6877279792, 38.8369633325), (16.0106173244, 38.8369633325))
        make_face(mode=Mode.SUBTRACT)
    extrude(amount=F7_DEPTH)


with BuildPart() as f1_1:
    # F8: moved
    add(f1.part.scale(F8_SCALE))


solid = f1_1.part
